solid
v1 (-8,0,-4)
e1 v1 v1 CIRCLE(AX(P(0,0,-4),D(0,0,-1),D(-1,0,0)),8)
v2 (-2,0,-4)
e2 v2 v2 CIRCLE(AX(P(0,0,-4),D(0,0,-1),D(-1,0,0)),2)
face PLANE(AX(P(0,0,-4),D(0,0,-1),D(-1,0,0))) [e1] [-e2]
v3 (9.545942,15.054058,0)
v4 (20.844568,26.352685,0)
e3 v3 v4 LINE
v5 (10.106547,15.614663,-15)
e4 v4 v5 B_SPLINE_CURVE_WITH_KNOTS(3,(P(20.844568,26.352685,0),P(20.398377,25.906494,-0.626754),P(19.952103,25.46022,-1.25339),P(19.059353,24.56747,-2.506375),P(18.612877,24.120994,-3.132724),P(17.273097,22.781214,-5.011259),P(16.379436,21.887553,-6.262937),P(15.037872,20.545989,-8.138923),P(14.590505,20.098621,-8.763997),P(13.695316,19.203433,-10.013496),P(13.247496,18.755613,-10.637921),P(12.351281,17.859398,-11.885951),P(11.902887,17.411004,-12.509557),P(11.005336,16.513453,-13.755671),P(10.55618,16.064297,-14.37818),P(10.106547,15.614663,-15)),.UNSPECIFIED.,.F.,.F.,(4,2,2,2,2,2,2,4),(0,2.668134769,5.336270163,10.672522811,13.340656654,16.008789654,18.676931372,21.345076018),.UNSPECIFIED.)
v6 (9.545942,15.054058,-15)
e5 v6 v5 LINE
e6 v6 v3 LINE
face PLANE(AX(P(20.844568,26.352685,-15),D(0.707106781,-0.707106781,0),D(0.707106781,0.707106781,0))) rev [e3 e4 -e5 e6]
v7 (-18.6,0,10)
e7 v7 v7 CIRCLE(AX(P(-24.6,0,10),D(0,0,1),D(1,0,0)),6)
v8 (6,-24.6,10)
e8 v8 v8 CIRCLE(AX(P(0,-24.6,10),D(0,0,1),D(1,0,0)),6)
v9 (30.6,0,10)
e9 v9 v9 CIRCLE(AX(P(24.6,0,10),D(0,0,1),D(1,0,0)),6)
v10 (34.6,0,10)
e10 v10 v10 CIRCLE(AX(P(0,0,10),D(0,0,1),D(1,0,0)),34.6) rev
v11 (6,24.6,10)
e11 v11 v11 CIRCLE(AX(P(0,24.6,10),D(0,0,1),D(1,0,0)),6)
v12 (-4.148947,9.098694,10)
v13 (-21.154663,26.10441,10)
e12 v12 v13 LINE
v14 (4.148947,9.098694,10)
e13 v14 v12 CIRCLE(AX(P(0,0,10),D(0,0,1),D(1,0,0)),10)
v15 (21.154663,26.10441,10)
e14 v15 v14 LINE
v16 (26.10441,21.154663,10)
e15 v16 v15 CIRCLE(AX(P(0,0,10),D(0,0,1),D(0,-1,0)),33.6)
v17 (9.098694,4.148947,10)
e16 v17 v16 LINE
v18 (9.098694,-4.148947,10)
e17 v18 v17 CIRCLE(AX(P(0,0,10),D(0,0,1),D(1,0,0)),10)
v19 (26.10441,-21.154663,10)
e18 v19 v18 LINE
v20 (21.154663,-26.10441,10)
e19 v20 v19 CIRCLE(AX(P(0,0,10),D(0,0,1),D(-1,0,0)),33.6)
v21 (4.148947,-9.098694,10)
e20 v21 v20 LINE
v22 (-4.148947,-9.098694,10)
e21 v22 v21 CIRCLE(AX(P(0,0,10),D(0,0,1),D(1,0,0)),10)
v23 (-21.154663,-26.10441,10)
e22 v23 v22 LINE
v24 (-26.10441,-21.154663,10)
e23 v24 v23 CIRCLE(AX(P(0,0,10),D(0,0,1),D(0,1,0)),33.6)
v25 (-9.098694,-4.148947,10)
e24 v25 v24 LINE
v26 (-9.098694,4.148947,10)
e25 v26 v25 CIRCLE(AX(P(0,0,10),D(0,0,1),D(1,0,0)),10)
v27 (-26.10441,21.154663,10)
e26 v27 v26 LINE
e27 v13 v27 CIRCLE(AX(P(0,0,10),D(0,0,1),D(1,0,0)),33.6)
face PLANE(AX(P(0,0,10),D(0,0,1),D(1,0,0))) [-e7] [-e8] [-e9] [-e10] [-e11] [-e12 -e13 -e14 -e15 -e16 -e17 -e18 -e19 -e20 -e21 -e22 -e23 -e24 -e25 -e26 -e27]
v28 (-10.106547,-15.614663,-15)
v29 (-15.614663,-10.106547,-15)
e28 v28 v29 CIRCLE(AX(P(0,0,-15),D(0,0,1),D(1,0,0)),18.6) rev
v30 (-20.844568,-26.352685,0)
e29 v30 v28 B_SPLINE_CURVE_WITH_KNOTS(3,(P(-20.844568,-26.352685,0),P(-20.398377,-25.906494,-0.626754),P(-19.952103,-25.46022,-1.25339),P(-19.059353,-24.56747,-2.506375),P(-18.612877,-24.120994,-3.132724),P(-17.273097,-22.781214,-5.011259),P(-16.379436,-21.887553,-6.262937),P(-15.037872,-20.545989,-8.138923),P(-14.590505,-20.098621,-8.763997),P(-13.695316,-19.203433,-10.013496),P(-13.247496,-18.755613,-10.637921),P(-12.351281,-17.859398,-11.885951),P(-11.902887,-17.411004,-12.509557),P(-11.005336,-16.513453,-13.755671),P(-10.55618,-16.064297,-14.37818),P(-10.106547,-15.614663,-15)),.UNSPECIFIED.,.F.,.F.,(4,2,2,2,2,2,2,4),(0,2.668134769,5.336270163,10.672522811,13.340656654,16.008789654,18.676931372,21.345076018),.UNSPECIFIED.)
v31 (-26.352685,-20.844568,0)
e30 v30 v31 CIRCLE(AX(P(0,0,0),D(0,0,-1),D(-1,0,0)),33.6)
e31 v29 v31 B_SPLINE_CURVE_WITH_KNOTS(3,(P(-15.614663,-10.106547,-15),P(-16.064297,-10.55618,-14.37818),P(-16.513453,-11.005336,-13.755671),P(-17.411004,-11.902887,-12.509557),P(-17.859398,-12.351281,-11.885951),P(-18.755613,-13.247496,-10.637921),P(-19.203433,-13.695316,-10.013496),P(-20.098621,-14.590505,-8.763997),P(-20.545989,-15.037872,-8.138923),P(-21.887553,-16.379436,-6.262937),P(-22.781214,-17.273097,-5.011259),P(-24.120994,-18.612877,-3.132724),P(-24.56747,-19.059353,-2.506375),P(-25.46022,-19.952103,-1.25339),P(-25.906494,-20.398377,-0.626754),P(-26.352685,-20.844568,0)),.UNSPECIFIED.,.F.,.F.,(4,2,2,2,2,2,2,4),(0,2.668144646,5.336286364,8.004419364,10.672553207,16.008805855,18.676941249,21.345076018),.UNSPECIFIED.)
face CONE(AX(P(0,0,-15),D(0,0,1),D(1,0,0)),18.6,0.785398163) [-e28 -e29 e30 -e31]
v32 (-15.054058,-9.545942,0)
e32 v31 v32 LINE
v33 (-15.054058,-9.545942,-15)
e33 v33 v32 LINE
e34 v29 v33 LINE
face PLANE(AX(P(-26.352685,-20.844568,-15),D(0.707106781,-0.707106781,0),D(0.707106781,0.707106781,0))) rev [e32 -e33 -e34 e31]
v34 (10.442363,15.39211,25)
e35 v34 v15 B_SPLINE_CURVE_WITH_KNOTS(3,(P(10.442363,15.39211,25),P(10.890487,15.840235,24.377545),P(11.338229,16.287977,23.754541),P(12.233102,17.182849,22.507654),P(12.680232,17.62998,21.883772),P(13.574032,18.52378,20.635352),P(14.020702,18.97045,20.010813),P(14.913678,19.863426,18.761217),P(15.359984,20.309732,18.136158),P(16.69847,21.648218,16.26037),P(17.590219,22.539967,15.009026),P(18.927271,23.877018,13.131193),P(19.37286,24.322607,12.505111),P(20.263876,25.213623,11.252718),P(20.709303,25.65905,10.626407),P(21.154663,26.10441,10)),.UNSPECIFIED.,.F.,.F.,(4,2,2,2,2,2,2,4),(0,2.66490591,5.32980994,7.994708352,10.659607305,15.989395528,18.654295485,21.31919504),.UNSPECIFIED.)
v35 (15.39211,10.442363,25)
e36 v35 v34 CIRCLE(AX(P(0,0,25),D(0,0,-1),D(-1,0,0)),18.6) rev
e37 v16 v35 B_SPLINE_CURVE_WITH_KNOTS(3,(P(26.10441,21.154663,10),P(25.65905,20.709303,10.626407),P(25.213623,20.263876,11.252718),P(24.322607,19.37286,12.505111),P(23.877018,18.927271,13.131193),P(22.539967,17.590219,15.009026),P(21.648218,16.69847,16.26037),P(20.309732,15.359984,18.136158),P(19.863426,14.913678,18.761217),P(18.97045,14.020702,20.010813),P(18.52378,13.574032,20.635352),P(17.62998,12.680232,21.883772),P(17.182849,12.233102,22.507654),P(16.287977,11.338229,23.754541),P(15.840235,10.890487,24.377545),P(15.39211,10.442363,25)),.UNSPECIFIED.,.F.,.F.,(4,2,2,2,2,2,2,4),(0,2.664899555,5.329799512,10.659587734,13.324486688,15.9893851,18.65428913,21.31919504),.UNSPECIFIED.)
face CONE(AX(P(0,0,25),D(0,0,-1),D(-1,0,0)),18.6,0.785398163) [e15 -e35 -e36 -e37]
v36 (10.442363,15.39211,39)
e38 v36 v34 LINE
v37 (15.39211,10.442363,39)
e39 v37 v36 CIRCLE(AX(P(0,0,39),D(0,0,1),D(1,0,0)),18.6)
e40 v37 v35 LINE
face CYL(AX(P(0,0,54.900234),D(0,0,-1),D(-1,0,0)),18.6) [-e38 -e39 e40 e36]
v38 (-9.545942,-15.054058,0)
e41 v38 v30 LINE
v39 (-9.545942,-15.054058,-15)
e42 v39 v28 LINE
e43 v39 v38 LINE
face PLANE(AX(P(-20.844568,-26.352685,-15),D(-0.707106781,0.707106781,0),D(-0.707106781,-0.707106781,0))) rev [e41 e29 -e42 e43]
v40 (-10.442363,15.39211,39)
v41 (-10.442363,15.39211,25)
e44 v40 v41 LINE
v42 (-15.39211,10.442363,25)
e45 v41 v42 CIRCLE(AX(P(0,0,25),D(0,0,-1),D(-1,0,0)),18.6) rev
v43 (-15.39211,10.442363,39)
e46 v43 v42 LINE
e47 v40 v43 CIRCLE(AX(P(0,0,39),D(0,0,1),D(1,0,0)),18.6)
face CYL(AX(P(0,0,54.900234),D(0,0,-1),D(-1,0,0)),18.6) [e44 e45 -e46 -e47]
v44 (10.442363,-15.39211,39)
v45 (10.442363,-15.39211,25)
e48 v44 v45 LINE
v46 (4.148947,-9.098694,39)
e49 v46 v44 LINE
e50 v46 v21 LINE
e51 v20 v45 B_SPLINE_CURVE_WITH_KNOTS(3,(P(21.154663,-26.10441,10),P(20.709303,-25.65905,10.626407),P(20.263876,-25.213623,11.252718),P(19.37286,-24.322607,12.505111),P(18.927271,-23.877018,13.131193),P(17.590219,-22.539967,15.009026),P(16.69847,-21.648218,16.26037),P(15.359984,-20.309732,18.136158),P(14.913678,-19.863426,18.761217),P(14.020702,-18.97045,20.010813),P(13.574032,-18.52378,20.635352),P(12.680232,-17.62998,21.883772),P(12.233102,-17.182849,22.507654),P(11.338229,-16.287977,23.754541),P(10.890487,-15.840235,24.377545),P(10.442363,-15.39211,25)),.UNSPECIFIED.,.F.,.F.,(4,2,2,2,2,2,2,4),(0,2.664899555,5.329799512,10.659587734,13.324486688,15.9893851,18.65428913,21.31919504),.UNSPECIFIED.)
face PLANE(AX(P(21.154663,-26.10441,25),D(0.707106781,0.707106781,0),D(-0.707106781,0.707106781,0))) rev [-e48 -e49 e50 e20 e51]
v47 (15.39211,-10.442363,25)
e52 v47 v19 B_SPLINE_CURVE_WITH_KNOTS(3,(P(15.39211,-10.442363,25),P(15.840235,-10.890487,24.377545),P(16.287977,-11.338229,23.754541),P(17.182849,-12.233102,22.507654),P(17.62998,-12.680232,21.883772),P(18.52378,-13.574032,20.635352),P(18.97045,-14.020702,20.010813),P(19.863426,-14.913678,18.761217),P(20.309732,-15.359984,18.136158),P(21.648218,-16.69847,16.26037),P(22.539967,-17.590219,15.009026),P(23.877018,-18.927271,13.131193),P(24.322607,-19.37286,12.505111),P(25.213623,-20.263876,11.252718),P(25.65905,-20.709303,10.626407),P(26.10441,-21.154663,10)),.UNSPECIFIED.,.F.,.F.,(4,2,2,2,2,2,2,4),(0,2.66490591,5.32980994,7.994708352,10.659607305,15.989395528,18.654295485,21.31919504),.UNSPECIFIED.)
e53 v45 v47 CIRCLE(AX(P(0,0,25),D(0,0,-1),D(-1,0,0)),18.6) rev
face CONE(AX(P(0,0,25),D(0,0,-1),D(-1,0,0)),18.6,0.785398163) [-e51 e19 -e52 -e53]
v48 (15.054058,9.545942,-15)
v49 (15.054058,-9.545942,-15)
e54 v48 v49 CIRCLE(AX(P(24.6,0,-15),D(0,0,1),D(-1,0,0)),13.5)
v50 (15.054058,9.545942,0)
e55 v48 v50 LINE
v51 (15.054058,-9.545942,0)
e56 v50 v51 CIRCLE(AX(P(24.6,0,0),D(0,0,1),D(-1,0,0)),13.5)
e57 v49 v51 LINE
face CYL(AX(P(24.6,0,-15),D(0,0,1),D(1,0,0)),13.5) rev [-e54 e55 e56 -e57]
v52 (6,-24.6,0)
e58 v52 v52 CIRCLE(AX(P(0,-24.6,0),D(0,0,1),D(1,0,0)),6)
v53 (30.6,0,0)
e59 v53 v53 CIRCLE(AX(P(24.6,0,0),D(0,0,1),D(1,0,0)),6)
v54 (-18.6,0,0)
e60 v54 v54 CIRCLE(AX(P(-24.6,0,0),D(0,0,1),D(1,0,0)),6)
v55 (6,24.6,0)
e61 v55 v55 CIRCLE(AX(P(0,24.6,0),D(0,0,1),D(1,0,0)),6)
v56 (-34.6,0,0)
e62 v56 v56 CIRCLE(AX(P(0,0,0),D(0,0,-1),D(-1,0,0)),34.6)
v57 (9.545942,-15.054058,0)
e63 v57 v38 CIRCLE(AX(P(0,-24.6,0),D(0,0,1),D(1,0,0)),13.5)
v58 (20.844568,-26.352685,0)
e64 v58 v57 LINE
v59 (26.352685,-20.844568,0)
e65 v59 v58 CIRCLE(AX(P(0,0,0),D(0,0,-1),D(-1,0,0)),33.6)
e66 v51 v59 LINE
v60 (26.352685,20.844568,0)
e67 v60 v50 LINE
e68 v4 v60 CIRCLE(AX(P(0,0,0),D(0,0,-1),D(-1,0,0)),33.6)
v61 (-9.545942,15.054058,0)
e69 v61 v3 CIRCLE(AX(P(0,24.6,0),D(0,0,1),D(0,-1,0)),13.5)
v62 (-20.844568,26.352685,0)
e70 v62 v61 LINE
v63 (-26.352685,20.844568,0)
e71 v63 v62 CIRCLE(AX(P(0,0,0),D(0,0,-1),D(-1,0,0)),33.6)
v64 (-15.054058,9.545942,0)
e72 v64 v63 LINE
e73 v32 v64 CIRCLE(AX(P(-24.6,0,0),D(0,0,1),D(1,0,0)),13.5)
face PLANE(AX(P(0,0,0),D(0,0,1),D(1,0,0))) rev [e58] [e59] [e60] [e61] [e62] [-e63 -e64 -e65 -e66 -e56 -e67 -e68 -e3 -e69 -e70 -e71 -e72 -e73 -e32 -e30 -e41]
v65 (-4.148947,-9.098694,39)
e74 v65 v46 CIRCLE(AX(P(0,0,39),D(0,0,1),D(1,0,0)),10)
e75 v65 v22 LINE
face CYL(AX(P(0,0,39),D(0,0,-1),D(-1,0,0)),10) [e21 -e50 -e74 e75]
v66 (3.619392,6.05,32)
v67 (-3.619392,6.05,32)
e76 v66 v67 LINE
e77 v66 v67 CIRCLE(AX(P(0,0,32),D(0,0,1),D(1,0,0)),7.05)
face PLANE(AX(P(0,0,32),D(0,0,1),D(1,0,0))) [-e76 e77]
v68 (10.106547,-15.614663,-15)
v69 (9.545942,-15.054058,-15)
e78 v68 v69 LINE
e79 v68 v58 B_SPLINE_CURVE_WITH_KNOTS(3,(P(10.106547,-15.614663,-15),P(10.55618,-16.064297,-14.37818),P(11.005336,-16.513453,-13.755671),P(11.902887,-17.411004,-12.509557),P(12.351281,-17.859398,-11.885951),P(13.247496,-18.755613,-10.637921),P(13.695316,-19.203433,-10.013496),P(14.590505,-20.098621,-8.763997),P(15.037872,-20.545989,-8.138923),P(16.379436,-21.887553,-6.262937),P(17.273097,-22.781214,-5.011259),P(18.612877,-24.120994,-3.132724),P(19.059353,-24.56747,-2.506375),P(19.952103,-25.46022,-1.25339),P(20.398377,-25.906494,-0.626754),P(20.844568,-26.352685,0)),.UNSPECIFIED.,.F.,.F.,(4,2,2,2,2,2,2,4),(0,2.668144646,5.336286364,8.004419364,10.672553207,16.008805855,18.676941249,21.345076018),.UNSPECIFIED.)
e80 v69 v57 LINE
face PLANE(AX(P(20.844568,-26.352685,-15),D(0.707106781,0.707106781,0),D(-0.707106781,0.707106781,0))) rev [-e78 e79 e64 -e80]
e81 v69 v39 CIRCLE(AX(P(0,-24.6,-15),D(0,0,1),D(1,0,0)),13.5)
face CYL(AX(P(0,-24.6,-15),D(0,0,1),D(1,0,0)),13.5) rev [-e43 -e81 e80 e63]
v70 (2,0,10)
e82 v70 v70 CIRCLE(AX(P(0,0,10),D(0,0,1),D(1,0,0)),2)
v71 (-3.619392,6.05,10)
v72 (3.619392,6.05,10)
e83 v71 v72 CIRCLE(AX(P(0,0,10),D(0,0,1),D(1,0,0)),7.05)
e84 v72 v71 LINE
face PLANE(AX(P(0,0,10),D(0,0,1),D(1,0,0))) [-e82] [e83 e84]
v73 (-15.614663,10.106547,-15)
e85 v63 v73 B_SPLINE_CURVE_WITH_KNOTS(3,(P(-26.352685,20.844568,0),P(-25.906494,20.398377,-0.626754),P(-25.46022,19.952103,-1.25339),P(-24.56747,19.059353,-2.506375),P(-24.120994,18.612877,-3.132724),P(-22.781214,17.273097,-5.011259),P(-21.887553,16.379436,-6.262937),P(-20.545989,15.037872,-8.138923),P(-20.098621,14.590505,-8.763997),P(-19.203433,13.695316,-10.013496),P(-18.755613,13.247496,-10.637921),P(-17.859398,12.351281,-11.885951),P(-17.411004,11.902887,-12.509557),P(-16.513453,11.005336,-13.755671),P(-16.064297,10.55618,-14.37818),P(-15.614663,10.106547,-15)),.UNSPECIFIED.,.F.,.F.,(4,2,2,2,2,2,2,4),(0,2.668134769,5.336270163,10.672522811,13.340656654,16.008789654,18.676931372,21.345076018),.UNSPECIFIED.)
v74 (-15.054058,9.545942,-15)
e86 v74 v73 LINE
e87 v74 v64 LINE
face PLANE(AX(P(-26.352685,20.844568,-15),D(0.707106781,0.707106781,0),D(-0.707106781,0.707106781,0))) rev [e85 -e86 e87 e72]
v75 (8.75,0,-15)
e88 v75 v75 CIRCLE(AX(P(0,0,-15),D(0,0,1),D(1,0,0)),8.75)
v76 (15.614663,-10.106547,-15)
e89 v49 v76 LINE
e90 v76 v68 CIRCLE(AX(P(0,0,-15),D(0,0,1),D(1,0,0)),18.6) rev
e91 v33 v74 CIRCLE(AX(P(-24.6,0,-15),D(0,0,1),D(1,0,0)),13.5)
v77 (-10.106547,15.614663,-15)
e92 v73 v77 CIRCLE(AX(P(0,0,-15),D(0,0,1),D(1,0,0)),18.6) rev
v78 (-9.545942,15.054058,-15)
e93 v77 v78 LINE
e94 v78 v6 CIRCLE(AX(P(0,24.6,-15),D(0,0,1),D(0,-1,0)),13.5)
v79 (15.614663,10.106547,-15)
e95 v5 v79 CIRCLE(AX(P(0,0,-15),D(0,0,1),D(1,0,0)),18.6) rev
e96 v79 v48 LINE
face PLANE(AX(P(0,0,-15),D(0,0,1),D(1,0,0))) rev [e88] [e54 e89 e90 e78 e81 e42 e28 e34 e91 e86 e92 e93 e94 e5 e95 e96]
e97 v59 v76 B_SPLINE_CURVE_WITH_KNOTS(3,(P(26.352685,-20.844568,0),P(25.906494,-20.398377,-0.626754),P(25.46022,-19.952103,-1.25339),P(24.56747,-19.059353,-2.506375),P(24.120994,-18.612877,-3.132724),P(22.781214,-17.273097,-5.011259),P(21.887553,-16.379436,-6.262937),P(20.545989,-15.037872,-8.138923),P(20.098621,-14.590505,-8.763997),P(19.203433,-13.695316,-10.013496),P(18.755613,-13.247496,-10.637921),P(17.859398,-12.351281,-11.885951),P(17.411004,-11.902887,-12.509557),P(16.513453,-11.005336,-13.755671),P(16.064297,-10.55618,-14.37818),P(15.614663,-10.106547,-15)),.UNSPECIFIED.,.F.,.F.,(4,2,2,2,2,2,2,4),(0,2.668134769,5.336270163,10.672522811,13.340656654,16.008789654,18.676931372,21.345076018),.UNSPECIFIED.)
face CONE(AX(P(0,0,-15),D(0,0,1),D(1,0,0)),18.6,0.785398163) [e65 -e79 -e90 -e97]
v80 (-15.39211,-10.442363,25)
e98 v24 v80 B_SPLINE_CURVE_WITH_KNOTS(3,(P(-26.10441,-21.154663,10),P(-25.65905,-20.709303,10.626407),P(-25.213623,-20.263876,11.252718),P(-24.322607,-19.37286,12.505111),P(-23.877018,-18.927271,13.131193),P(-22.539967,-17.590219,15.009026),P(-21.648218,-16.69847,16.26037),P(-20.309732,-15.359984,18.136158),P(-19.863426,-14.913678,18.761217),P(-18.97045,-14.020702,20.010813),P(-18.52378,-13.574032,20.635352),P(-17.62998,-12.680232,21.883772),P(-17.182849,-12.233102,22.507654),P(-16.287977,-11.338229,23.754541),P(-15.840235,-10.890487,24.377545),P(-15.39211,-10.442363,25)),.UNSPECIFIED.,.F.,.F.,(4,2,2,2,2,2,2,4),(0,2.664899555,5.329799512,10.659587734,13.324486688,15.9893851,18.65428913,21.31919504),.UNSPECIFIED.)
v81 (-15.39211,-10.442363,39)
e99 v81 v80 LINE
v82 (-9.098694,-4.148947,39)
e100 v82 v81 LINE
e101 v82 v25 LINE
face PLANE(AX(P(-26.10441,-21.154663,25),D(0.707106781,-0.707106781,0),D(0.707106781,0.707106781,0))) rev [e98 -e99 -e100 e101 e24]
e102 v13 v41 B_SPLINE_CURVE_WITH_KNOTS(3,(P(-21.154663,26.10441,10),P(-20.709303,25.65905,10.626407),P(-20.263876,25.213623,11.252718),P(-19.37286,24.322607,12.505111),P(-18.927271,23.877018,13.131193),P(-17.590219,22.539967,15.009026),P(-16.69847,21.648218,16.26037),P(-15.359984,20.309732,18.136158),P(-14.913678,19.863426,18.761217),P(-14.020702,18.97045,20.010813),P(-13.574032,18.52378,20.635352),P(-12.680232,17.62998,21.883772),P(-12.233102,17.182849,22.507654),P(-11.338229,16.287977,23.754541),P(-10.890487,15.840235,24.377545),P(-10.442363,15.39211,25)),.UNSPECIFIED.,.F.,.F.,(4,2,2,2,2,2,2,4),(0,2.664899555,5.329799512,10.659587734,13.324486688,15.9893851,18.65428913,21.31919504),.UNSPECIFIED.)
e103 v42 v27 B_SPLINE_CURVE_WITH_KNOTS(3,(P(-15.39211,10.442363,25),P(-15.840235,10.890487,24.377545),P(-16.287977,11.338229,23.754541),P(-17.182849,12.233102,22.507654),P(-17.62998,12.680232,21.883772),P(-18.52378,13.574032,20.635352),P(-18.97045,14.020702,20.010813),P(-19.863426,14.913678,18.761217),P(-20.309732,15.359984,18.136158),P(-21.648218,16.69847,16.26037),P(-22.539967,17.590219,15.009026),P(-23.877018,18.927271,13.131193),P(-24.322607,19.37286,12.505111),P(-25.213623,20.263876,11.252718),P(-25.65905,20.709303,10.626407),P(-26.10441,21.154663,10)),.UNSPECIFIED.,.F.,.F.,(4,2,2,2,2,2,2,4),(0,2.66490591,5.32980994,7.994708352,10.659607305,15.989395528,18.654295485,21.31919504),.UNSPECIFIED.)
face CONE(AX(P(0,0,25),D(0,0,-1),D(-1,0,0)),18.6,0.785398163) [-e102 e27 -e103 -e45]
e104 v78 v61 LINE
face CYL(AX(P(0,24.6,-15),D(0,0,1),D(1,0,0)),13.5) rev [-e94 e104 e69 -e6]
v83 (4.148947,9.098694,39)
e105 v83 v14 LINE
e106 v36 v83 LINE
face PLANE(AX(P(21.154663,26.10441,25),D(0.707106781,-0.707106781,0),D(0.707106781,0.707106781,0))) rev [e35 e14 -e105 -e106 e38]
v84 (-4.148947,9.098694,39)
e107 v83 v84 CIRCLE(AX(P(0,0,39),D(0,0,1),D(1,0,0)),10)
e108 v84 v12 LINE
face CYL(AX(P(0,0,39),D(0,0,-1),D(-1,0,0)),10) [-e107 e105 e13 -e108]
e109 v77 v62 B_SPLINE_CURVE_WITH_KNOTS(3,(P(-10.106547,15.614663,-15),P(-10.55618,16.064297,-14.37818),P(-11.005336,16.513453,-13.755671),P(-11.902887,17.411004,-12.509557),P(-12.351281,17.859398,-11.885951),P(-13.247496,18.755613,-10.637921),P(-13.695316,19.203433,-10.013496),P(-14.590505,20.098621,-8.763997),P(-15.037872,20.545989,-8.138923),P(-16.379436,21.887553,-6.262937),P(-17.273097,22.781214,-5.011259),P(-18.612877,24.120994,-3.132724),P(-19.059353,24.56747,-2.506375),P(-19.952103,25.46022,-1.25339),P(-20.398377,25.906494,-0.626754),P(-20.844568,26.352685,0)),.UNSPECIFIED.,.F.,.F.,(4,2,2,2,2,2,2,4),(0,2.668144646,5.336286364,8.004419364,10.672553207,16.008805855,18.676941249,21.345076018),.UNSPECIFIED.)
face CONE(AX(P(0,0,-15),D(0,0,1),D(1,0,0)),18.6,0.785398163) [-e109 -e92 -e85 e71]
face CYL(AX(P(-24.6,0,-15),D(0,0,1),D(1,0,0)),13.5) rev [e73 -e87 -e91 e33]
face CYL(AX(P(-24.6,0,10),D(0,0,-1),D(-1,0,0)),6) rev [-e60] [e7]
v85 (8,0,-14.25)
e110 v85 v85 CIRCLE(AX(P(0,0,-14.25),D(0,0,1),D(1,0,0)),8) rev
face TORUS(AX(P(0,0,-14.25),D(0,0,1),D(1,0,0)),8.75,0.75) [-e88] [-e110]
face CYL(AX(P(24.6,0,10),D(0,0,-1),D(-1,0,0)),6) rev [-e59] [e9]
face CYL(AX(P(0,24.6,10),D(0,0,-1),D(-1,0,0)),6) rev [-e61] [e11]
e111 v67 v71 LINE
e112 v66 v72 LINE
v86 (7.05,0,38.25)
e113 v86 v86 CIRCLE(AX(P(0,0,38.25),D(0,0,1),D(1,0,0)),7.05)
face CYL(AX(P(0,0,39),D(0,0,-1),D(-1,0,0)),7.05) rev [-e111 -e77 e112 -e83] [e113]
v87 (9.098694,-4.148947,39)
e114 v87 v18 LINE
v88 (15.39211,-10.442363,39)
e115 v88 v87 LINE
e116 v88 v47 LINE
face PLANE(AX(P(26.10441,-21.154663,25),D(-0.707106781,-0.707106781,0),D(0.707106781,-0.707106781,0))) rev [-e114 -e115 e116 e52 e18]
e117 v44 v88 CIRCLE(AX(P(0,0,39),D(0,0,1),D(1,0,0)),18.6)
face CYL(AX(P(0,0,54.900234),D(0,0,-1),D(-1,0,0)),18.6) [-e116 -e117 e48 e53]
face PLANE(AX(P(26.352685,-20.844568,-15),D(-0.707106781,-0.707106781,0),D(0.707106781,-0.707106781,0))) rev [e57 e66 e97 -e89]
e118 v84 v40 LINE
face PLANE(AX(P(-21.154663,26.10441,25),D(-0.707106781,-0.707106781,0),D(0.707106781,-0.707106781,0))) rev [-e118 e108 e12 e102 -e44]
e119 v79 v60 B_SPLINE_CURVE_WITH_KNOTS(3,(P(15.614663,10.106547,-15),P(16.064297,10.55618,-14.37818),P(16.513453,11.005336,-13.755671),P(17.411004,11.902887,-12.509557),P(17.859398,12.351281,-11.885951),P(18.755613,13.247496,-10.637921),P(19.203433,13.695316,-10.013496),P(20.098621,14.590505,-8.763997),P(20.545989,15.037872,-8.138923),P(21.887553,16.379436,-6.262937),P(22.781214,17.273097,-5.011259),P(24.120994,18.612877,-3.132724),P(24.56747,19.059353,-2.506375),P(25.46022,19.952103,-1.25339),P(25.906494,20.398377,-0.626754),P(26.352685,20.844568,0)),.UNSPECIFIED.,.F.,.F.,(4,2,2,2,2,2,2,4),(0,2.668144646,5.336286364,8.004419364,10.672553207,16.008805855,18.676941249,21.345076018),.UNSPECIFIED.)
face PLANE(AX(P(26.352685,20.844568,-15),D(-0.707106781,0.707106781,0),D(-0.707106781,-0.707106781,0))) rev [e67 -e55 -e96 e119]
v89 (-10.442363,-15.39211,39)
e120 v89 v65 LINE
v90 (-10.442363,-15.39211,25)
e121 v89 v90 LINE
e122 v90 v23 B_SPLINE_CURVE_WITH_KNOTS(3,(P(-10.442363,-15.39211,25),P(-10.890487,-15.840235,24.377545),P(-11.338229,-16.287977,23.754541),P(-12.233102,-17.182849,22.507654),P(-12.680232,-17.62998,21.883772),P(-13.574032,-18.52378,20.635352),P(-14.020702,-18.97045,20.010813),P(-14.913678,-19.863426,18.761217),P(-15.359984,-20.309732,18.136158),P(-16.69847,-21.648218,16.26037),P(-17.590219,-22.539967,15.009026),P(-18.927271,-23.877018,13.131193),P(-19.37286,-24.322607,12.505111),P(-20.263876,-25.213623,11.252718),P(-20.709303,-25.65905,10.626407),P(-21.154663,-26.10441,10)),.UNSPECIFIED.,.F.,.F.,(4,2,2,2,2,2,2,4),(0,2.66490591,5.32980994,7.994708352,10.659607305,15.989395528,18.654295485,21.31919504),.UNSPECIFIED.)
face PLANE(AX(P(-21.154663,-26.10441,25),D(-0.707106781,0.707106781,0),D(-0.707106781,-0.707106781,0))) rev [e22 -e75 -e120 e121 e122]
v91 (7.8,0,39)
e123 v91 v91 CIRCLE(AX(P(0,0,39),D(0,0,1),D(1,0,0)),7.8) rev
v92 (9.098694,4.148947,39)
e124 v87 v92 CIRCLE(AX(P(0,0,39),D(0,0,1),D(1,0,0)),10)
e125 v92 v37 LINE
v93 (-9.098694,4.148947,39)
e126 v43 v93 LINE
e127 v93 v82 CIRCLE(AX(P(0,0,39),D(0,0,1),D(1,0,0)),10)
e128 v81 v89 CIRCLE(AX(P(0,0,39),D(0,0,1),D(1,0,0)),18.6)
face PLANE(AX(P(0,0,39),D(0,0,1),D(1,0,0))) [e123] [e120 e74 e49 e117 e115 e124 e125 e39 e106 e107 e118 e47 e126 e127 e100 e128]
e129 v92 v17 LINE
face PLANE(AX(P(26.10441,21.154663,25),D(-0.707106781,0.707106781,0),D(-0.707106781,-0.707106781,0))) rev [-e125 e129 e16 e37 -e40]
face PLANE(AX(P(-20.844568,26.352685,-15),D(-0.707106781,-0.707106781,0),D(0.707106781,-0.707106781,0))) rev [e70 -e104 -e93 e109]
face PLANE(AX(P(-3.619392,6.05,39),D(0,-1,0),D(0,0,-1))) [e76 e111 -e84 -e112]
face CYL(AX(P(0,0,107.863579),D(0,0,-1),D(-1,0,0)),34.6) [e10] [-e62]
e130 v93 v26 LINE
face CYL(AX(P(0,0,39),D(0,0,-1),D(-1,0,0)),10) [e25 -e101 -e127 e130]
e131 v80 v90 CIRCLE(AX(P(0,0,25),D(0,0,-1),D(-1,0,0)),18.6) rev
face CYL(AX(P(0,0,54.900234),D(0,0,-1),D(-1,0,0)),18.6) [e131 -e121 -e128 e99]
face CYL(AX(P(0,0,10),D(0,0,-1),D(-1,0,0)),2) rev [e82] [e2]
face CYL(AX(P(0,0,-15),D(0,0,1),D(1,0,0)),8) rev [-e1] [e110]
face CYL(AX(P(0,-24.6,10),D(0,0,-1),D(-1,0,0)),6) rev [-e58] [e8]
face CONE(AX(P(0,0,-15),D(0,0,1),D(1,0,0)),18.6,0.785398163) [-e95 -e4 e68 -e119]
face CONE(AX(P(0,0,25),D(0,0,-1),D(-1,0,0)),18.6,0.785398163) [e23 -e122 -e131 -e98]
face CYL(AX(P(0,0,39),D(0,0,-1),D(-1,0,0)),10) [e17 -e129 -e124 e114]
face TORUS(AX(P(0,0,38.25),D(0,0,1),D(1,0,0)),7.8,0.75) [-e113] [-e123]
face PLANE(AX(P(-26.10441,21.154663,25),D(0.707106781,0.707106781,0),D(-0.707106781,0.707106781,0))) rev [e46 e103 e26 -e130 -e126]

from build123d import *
from build123d.topology import SkipClean

# Parameters (mm, degrees)
SKETCH2_R           = 33.6
SKETCH2_R_2         = 2
SKETCH2_R_3         = 6
BOSS_EXTRUDE1_DEPTH = 10
BOSS_EXTRUDE2_START = 15
BOSS_EXTRUDE2_DEPTH = 15
CIRPATTERN1_COUNT   = 4
SKETCH4_R           = 10
BOSS_EXTRUDE3_DEPTH = 29
SKETCH5_R           = 34.6
SKETCH5_R_2         = 33.6
BOSS_EXTRUDE5_DEPTH = 10
BOSS_EXTRUDE6_START = 4
SKETCH6_R           = 8
SKETCH6_R_2         = 2
BOSS_EXTRUDE6_DEPTH = 4
BOSS_EXTRUDE7_DEPTH = 15
CIRPATTERN2_COUNT   = 4
CHAMFER1_SIZE       = 15
CHAMFER2_SIZE       = 15
BOSS_EXTRUDE8_DEPTH = 14
CUT_EXTRUDE1_START  = -7
SKETCH10_R          = 7.05
CUT_EXTRUDE1_DEPTH  = 7
FILLET1_R           = 0.75


with BuildPart() as part:
    # Sketch2 → Boss-Extrude1 (new body)
    with BuildSketch(Plane.XY):
        Circle(SKETCH2_R)
        Circle(SKETCH2_R_2, mode=Mode.SUBTRACT)
        with Locations((0, 24.6)):
            Circle(SKETCH2_R_3, mode=Mode.SUBTRACT)
        with Locations((0, -24.6)):
            Circle(SKETCH2_R_3, mode=Mode.SUBTRACT)
        with Locations((-24.6, 0)):
            Circle(SKETCH2_R_3, mode=Mode.SUBTRACT)
        with Locations((24.6, 0)):
            Circle(SKETCH2_R_3, mode=Mode.SUBTRACT)
    extrude(amount=BOSS_EXTRUDE1_DEPTH)

    # Sketch3 → Boss-Extrude2 (add)
    with BuildSketch(Plane(origin=(0, 0, 0), x_dir=(-1, 0, 0), z_dir=(0, 0, -1)).offset(BOSS_EXTRUDE2_START)):
        with BuildLine():
            Line((-8, 0), (-11.1, 0))
            ThreePointArc((-11.1, 0), (-12.127626311, -5.166226337), (-15.054058454, -9.545941546))
            Line((-15.054058454, -9.545941546), (-26.352684728, -20.84456782))
            ThreePointArc((-26.352684728, -20.84456782), (-23.758787848, -23.758787848), (-20.84456782, -26.352684728))
            Line((-20.84456782, -26.352684728), (-9.545941546, -15.054058454))
            ThreePointArc((-9.545941546, -15.054058454), (-5.166226337, -12.127626311), (0, -11.1))
            Line((0, -11.1), (0, -8))
            ThreePointArc((0, -8), (-5.656854249, -5.656854249), (-8, 0))
        make_face()
    boss_extrude2 = extrude(amount=-BOSS_EXTRUDE2_DEPTH)

    # CirPattern1: Boss-Extrude2 ×4 about axis
    with SkipClean():  # the faces are left unmerged after this step: merging them gives an invalid solid
        cirpattern1_axis = Axis((0, 0, 0), (0, 0, 1))
        for i in range(1, CIRPATTERN1_COUNT):
            add(boss_extrude2.rotate(cirpattern1_axis, i * 360 / CIRPATTERN1_COUNT))

    # Sketch4 → Boss-Extrude3 (add)
    with SkipClean():  # the faces are left unmerged after this step: merging them gives an invalid solid
        with BuildSketch(Plane.XY.offset(10)):
            with Locations(Location((0, 0, 0), (0, 0, 180))):
                Circle(SKETCH4_R)
            with BuildLine():
                Line((-3.619392214, 6.05), (3.619392214, 6.05))
                ThreePointArc((3.619392214, 6.05), (0, -7.05), (-3.619392214, 6.05))
            make_face(mode=Mode.SUBTRACT)
        extrude(amount=BOSS_EXTRUDE3_DEPTH)

    # Sketch5 → Boss-Extrude5 (add)
    with BuildSketch(Plane(origin=(0, 0, 0), x_dir=(-1, 0, 0), z_dir=(0, 0, -1))):
        Circle(SKETCH5_R)
        Circle(SKETCH5_R_2, mode=Mode.SUBTRACT)
    extrude(amount=-BOSS_EXTRUDE5_DEPTH)

    # Sketch6 → Boss-Extrude6 (add)
    with SkipClean():  # the faces are left unmerged after this step: merging them gives an invalid solid
        with BuildSketch(Plane(origin=(0, 0, 0), x_dir=(-1, 0, 0), z_dir=(0, 0, -1)).offset(BOSS_EXTRUDE6_START)):
            with Locations(Location((0, 0, 0), (0, 0, 180))):
                Circle(SKETCH6_R)
            Circle(SKETCH6_R_2, mode=Mode.SUBTRACT)
        extrude(amount=-BOSS_EXTRUDE6_DEPTH)

    # Sketch8 → Boss-Extrude7 (add)
    with SkipClean():  # the faces are left unmerged after this step: merging them gives an invalid solid
        with BuildSketch(Plane.XY.offset(10)):
            with BuildLine():
                Line((21.154662867, -26.104410336), (4.148946916, -9.098694384))
                ThreePointArc((4.148946916, -9.098694384), (7.071067812, -7.071067812), (9.098694384, -4.148946916))
                Line((9.098694384, -4.148946916), (26.104410336, -21.154662867))
                ThreePointArc((26.104410336, -21.154662867), (23.758787848, -23.758787848), (21.154662867, -26.104410336))
            make_face()
        boss_extrude7 = extrude(amount=BOSS_EXTRUDE7_DEPTH)

    # CirPattern2: Boss-Extrude7 ×4 about axis
    with SkipClean():  # the faces are left unmerged after this step: merging them gives an invalid solid
        cirpattern2_axis = Axis((0, 0, 0), (0, 0, 1))
        for i in range(1, CIRPATTERN2_COUNT):
            add(boss_extrude7.rotate(cirpattern2_axis, i * 360 / CIRPATTERN2_COUNT))

    # Chamfer1
    chamfer1_edges = [part.edges().sort_by_distance(p)[0] for p in [
        (23.758787848, 23.758787848, -15),
        (23.758787848, -23.758787848, -15),
        (-23.758787848, -23.758787848, -15),
        (-23.758787848, 23.758787848, -15),
    ]]
    chamfer(chamfer1_edges, length=CHAMFER1_SIZE - 0.0001)  # a hair under: the kernel refuses the full size

    # Chamfer2
    chamfer2_edges = [part.edges().sort_by_distance(p)[0] for p in [
        (23.758787848, -23.758787848, 25),
        (-23.758787848, -23.758787848, 25),
        (-23.758787848, 23.758787848, 25),
        (23.758787848, 23.758787848, 25),
    ]]
    chamfer(chamfer2_edges, length=CHAMFER2_SIZE - 0.0001)  # a hair under: the kernel refuses the full size

    # Sketch9 → Boss-Extrude8 (add)
    with BuildSketch(Plane.XY.offset(25)):
        with BuildLine():
            Line((4.148946916, 9.098694384), (10.442362812, 15.392110281))
            ThreePointArc((10.442362812, 15.392110281), (13.15218613, 13.15218613), (15.392110281, 10.442362812))
            Line((15.392110281, 10.442362812), (9.098694384, 4.148946916))
            ThreePointArc((9.098694384, 4.148946916), (7.071067812, 7.071067812), (4.148946916, 9.098694384))
        make_face()
        with BuildLine():
            Line((10.442362812, -15.392110281), (4.148946916, -9.098694384))
            ThreePointArc((4.148946916, -9.098694384), (7.071067812, -7.071067812), (9.098694384, -4.148946916))
            Line((9.098694384, -4.148946916), (15.392110281, -10.442362812))
            ThreePointArc((15.392110281, -10.442362812), (13.15218613, -13.15218613), (10.442362812, -15.392110281))
        make_face()
        with BuildLine():
            Line((-15.392110281, -10.442362812), (-9.098694384, -4.148946916))
            ThreePointArc((-9.098694384, -4.148946916), (-7.071067812, -7.071067812), (-4.148946916, -9.098694384))
            Line((-4.148946916, -9.098694384), (-10.442362812, -15.392110281))
            ThreePointArc((-10.442362812, -15.392110281), (-13.15218613, -13.15218613), (-15.392110281, -10.442362812))
        make_face()
        with BuildLine():
            Line((-15.392110281, 10.442362812), (-9.098694384, 4.148946916))
            ThreePointArc((-9.098694384, 4.148946916), (-7.071067812, 7.071067812), (-4.148946916, 9.098694384))
            Line((-4.148946916, 9.098694384), (-10.442362812, 15.392110281))
            ThreePointArc((-10.442362812, 15.392110281), (-13.15218613, 13.15218613), (-15.392110281, 10.442362812))
        make_face()
    extrude(amount=BOSS_EXTRUDE8_DEPTH)

    # Sketch10 → Cut-Extrude1 (cut)
    with SkipClean():  # the faces are left unmerged after this step: merging them gives an invalid solid
        with BuildSketch(Plane.XY.offset(39).offset(CUT_EXTRUDE1_START)):
            with Locations(Location((0, 0, 0), (0, 0, 120.889831942))):
                Circle(SKETCH10_R)
        extrude(amount=CUT_EXTRUDE1_DEPTH, mode=Mode.SUBTRACT)

    # Fillet1
    fillet1_edges = [part.edges().sort_by_distance(p)[0] for p in [
        (8, 0, -15),
        (0, -7.05, 39),
    ]]
    fillet(fillet1_edges, radius=FILLET1_R)


solid = part.part
